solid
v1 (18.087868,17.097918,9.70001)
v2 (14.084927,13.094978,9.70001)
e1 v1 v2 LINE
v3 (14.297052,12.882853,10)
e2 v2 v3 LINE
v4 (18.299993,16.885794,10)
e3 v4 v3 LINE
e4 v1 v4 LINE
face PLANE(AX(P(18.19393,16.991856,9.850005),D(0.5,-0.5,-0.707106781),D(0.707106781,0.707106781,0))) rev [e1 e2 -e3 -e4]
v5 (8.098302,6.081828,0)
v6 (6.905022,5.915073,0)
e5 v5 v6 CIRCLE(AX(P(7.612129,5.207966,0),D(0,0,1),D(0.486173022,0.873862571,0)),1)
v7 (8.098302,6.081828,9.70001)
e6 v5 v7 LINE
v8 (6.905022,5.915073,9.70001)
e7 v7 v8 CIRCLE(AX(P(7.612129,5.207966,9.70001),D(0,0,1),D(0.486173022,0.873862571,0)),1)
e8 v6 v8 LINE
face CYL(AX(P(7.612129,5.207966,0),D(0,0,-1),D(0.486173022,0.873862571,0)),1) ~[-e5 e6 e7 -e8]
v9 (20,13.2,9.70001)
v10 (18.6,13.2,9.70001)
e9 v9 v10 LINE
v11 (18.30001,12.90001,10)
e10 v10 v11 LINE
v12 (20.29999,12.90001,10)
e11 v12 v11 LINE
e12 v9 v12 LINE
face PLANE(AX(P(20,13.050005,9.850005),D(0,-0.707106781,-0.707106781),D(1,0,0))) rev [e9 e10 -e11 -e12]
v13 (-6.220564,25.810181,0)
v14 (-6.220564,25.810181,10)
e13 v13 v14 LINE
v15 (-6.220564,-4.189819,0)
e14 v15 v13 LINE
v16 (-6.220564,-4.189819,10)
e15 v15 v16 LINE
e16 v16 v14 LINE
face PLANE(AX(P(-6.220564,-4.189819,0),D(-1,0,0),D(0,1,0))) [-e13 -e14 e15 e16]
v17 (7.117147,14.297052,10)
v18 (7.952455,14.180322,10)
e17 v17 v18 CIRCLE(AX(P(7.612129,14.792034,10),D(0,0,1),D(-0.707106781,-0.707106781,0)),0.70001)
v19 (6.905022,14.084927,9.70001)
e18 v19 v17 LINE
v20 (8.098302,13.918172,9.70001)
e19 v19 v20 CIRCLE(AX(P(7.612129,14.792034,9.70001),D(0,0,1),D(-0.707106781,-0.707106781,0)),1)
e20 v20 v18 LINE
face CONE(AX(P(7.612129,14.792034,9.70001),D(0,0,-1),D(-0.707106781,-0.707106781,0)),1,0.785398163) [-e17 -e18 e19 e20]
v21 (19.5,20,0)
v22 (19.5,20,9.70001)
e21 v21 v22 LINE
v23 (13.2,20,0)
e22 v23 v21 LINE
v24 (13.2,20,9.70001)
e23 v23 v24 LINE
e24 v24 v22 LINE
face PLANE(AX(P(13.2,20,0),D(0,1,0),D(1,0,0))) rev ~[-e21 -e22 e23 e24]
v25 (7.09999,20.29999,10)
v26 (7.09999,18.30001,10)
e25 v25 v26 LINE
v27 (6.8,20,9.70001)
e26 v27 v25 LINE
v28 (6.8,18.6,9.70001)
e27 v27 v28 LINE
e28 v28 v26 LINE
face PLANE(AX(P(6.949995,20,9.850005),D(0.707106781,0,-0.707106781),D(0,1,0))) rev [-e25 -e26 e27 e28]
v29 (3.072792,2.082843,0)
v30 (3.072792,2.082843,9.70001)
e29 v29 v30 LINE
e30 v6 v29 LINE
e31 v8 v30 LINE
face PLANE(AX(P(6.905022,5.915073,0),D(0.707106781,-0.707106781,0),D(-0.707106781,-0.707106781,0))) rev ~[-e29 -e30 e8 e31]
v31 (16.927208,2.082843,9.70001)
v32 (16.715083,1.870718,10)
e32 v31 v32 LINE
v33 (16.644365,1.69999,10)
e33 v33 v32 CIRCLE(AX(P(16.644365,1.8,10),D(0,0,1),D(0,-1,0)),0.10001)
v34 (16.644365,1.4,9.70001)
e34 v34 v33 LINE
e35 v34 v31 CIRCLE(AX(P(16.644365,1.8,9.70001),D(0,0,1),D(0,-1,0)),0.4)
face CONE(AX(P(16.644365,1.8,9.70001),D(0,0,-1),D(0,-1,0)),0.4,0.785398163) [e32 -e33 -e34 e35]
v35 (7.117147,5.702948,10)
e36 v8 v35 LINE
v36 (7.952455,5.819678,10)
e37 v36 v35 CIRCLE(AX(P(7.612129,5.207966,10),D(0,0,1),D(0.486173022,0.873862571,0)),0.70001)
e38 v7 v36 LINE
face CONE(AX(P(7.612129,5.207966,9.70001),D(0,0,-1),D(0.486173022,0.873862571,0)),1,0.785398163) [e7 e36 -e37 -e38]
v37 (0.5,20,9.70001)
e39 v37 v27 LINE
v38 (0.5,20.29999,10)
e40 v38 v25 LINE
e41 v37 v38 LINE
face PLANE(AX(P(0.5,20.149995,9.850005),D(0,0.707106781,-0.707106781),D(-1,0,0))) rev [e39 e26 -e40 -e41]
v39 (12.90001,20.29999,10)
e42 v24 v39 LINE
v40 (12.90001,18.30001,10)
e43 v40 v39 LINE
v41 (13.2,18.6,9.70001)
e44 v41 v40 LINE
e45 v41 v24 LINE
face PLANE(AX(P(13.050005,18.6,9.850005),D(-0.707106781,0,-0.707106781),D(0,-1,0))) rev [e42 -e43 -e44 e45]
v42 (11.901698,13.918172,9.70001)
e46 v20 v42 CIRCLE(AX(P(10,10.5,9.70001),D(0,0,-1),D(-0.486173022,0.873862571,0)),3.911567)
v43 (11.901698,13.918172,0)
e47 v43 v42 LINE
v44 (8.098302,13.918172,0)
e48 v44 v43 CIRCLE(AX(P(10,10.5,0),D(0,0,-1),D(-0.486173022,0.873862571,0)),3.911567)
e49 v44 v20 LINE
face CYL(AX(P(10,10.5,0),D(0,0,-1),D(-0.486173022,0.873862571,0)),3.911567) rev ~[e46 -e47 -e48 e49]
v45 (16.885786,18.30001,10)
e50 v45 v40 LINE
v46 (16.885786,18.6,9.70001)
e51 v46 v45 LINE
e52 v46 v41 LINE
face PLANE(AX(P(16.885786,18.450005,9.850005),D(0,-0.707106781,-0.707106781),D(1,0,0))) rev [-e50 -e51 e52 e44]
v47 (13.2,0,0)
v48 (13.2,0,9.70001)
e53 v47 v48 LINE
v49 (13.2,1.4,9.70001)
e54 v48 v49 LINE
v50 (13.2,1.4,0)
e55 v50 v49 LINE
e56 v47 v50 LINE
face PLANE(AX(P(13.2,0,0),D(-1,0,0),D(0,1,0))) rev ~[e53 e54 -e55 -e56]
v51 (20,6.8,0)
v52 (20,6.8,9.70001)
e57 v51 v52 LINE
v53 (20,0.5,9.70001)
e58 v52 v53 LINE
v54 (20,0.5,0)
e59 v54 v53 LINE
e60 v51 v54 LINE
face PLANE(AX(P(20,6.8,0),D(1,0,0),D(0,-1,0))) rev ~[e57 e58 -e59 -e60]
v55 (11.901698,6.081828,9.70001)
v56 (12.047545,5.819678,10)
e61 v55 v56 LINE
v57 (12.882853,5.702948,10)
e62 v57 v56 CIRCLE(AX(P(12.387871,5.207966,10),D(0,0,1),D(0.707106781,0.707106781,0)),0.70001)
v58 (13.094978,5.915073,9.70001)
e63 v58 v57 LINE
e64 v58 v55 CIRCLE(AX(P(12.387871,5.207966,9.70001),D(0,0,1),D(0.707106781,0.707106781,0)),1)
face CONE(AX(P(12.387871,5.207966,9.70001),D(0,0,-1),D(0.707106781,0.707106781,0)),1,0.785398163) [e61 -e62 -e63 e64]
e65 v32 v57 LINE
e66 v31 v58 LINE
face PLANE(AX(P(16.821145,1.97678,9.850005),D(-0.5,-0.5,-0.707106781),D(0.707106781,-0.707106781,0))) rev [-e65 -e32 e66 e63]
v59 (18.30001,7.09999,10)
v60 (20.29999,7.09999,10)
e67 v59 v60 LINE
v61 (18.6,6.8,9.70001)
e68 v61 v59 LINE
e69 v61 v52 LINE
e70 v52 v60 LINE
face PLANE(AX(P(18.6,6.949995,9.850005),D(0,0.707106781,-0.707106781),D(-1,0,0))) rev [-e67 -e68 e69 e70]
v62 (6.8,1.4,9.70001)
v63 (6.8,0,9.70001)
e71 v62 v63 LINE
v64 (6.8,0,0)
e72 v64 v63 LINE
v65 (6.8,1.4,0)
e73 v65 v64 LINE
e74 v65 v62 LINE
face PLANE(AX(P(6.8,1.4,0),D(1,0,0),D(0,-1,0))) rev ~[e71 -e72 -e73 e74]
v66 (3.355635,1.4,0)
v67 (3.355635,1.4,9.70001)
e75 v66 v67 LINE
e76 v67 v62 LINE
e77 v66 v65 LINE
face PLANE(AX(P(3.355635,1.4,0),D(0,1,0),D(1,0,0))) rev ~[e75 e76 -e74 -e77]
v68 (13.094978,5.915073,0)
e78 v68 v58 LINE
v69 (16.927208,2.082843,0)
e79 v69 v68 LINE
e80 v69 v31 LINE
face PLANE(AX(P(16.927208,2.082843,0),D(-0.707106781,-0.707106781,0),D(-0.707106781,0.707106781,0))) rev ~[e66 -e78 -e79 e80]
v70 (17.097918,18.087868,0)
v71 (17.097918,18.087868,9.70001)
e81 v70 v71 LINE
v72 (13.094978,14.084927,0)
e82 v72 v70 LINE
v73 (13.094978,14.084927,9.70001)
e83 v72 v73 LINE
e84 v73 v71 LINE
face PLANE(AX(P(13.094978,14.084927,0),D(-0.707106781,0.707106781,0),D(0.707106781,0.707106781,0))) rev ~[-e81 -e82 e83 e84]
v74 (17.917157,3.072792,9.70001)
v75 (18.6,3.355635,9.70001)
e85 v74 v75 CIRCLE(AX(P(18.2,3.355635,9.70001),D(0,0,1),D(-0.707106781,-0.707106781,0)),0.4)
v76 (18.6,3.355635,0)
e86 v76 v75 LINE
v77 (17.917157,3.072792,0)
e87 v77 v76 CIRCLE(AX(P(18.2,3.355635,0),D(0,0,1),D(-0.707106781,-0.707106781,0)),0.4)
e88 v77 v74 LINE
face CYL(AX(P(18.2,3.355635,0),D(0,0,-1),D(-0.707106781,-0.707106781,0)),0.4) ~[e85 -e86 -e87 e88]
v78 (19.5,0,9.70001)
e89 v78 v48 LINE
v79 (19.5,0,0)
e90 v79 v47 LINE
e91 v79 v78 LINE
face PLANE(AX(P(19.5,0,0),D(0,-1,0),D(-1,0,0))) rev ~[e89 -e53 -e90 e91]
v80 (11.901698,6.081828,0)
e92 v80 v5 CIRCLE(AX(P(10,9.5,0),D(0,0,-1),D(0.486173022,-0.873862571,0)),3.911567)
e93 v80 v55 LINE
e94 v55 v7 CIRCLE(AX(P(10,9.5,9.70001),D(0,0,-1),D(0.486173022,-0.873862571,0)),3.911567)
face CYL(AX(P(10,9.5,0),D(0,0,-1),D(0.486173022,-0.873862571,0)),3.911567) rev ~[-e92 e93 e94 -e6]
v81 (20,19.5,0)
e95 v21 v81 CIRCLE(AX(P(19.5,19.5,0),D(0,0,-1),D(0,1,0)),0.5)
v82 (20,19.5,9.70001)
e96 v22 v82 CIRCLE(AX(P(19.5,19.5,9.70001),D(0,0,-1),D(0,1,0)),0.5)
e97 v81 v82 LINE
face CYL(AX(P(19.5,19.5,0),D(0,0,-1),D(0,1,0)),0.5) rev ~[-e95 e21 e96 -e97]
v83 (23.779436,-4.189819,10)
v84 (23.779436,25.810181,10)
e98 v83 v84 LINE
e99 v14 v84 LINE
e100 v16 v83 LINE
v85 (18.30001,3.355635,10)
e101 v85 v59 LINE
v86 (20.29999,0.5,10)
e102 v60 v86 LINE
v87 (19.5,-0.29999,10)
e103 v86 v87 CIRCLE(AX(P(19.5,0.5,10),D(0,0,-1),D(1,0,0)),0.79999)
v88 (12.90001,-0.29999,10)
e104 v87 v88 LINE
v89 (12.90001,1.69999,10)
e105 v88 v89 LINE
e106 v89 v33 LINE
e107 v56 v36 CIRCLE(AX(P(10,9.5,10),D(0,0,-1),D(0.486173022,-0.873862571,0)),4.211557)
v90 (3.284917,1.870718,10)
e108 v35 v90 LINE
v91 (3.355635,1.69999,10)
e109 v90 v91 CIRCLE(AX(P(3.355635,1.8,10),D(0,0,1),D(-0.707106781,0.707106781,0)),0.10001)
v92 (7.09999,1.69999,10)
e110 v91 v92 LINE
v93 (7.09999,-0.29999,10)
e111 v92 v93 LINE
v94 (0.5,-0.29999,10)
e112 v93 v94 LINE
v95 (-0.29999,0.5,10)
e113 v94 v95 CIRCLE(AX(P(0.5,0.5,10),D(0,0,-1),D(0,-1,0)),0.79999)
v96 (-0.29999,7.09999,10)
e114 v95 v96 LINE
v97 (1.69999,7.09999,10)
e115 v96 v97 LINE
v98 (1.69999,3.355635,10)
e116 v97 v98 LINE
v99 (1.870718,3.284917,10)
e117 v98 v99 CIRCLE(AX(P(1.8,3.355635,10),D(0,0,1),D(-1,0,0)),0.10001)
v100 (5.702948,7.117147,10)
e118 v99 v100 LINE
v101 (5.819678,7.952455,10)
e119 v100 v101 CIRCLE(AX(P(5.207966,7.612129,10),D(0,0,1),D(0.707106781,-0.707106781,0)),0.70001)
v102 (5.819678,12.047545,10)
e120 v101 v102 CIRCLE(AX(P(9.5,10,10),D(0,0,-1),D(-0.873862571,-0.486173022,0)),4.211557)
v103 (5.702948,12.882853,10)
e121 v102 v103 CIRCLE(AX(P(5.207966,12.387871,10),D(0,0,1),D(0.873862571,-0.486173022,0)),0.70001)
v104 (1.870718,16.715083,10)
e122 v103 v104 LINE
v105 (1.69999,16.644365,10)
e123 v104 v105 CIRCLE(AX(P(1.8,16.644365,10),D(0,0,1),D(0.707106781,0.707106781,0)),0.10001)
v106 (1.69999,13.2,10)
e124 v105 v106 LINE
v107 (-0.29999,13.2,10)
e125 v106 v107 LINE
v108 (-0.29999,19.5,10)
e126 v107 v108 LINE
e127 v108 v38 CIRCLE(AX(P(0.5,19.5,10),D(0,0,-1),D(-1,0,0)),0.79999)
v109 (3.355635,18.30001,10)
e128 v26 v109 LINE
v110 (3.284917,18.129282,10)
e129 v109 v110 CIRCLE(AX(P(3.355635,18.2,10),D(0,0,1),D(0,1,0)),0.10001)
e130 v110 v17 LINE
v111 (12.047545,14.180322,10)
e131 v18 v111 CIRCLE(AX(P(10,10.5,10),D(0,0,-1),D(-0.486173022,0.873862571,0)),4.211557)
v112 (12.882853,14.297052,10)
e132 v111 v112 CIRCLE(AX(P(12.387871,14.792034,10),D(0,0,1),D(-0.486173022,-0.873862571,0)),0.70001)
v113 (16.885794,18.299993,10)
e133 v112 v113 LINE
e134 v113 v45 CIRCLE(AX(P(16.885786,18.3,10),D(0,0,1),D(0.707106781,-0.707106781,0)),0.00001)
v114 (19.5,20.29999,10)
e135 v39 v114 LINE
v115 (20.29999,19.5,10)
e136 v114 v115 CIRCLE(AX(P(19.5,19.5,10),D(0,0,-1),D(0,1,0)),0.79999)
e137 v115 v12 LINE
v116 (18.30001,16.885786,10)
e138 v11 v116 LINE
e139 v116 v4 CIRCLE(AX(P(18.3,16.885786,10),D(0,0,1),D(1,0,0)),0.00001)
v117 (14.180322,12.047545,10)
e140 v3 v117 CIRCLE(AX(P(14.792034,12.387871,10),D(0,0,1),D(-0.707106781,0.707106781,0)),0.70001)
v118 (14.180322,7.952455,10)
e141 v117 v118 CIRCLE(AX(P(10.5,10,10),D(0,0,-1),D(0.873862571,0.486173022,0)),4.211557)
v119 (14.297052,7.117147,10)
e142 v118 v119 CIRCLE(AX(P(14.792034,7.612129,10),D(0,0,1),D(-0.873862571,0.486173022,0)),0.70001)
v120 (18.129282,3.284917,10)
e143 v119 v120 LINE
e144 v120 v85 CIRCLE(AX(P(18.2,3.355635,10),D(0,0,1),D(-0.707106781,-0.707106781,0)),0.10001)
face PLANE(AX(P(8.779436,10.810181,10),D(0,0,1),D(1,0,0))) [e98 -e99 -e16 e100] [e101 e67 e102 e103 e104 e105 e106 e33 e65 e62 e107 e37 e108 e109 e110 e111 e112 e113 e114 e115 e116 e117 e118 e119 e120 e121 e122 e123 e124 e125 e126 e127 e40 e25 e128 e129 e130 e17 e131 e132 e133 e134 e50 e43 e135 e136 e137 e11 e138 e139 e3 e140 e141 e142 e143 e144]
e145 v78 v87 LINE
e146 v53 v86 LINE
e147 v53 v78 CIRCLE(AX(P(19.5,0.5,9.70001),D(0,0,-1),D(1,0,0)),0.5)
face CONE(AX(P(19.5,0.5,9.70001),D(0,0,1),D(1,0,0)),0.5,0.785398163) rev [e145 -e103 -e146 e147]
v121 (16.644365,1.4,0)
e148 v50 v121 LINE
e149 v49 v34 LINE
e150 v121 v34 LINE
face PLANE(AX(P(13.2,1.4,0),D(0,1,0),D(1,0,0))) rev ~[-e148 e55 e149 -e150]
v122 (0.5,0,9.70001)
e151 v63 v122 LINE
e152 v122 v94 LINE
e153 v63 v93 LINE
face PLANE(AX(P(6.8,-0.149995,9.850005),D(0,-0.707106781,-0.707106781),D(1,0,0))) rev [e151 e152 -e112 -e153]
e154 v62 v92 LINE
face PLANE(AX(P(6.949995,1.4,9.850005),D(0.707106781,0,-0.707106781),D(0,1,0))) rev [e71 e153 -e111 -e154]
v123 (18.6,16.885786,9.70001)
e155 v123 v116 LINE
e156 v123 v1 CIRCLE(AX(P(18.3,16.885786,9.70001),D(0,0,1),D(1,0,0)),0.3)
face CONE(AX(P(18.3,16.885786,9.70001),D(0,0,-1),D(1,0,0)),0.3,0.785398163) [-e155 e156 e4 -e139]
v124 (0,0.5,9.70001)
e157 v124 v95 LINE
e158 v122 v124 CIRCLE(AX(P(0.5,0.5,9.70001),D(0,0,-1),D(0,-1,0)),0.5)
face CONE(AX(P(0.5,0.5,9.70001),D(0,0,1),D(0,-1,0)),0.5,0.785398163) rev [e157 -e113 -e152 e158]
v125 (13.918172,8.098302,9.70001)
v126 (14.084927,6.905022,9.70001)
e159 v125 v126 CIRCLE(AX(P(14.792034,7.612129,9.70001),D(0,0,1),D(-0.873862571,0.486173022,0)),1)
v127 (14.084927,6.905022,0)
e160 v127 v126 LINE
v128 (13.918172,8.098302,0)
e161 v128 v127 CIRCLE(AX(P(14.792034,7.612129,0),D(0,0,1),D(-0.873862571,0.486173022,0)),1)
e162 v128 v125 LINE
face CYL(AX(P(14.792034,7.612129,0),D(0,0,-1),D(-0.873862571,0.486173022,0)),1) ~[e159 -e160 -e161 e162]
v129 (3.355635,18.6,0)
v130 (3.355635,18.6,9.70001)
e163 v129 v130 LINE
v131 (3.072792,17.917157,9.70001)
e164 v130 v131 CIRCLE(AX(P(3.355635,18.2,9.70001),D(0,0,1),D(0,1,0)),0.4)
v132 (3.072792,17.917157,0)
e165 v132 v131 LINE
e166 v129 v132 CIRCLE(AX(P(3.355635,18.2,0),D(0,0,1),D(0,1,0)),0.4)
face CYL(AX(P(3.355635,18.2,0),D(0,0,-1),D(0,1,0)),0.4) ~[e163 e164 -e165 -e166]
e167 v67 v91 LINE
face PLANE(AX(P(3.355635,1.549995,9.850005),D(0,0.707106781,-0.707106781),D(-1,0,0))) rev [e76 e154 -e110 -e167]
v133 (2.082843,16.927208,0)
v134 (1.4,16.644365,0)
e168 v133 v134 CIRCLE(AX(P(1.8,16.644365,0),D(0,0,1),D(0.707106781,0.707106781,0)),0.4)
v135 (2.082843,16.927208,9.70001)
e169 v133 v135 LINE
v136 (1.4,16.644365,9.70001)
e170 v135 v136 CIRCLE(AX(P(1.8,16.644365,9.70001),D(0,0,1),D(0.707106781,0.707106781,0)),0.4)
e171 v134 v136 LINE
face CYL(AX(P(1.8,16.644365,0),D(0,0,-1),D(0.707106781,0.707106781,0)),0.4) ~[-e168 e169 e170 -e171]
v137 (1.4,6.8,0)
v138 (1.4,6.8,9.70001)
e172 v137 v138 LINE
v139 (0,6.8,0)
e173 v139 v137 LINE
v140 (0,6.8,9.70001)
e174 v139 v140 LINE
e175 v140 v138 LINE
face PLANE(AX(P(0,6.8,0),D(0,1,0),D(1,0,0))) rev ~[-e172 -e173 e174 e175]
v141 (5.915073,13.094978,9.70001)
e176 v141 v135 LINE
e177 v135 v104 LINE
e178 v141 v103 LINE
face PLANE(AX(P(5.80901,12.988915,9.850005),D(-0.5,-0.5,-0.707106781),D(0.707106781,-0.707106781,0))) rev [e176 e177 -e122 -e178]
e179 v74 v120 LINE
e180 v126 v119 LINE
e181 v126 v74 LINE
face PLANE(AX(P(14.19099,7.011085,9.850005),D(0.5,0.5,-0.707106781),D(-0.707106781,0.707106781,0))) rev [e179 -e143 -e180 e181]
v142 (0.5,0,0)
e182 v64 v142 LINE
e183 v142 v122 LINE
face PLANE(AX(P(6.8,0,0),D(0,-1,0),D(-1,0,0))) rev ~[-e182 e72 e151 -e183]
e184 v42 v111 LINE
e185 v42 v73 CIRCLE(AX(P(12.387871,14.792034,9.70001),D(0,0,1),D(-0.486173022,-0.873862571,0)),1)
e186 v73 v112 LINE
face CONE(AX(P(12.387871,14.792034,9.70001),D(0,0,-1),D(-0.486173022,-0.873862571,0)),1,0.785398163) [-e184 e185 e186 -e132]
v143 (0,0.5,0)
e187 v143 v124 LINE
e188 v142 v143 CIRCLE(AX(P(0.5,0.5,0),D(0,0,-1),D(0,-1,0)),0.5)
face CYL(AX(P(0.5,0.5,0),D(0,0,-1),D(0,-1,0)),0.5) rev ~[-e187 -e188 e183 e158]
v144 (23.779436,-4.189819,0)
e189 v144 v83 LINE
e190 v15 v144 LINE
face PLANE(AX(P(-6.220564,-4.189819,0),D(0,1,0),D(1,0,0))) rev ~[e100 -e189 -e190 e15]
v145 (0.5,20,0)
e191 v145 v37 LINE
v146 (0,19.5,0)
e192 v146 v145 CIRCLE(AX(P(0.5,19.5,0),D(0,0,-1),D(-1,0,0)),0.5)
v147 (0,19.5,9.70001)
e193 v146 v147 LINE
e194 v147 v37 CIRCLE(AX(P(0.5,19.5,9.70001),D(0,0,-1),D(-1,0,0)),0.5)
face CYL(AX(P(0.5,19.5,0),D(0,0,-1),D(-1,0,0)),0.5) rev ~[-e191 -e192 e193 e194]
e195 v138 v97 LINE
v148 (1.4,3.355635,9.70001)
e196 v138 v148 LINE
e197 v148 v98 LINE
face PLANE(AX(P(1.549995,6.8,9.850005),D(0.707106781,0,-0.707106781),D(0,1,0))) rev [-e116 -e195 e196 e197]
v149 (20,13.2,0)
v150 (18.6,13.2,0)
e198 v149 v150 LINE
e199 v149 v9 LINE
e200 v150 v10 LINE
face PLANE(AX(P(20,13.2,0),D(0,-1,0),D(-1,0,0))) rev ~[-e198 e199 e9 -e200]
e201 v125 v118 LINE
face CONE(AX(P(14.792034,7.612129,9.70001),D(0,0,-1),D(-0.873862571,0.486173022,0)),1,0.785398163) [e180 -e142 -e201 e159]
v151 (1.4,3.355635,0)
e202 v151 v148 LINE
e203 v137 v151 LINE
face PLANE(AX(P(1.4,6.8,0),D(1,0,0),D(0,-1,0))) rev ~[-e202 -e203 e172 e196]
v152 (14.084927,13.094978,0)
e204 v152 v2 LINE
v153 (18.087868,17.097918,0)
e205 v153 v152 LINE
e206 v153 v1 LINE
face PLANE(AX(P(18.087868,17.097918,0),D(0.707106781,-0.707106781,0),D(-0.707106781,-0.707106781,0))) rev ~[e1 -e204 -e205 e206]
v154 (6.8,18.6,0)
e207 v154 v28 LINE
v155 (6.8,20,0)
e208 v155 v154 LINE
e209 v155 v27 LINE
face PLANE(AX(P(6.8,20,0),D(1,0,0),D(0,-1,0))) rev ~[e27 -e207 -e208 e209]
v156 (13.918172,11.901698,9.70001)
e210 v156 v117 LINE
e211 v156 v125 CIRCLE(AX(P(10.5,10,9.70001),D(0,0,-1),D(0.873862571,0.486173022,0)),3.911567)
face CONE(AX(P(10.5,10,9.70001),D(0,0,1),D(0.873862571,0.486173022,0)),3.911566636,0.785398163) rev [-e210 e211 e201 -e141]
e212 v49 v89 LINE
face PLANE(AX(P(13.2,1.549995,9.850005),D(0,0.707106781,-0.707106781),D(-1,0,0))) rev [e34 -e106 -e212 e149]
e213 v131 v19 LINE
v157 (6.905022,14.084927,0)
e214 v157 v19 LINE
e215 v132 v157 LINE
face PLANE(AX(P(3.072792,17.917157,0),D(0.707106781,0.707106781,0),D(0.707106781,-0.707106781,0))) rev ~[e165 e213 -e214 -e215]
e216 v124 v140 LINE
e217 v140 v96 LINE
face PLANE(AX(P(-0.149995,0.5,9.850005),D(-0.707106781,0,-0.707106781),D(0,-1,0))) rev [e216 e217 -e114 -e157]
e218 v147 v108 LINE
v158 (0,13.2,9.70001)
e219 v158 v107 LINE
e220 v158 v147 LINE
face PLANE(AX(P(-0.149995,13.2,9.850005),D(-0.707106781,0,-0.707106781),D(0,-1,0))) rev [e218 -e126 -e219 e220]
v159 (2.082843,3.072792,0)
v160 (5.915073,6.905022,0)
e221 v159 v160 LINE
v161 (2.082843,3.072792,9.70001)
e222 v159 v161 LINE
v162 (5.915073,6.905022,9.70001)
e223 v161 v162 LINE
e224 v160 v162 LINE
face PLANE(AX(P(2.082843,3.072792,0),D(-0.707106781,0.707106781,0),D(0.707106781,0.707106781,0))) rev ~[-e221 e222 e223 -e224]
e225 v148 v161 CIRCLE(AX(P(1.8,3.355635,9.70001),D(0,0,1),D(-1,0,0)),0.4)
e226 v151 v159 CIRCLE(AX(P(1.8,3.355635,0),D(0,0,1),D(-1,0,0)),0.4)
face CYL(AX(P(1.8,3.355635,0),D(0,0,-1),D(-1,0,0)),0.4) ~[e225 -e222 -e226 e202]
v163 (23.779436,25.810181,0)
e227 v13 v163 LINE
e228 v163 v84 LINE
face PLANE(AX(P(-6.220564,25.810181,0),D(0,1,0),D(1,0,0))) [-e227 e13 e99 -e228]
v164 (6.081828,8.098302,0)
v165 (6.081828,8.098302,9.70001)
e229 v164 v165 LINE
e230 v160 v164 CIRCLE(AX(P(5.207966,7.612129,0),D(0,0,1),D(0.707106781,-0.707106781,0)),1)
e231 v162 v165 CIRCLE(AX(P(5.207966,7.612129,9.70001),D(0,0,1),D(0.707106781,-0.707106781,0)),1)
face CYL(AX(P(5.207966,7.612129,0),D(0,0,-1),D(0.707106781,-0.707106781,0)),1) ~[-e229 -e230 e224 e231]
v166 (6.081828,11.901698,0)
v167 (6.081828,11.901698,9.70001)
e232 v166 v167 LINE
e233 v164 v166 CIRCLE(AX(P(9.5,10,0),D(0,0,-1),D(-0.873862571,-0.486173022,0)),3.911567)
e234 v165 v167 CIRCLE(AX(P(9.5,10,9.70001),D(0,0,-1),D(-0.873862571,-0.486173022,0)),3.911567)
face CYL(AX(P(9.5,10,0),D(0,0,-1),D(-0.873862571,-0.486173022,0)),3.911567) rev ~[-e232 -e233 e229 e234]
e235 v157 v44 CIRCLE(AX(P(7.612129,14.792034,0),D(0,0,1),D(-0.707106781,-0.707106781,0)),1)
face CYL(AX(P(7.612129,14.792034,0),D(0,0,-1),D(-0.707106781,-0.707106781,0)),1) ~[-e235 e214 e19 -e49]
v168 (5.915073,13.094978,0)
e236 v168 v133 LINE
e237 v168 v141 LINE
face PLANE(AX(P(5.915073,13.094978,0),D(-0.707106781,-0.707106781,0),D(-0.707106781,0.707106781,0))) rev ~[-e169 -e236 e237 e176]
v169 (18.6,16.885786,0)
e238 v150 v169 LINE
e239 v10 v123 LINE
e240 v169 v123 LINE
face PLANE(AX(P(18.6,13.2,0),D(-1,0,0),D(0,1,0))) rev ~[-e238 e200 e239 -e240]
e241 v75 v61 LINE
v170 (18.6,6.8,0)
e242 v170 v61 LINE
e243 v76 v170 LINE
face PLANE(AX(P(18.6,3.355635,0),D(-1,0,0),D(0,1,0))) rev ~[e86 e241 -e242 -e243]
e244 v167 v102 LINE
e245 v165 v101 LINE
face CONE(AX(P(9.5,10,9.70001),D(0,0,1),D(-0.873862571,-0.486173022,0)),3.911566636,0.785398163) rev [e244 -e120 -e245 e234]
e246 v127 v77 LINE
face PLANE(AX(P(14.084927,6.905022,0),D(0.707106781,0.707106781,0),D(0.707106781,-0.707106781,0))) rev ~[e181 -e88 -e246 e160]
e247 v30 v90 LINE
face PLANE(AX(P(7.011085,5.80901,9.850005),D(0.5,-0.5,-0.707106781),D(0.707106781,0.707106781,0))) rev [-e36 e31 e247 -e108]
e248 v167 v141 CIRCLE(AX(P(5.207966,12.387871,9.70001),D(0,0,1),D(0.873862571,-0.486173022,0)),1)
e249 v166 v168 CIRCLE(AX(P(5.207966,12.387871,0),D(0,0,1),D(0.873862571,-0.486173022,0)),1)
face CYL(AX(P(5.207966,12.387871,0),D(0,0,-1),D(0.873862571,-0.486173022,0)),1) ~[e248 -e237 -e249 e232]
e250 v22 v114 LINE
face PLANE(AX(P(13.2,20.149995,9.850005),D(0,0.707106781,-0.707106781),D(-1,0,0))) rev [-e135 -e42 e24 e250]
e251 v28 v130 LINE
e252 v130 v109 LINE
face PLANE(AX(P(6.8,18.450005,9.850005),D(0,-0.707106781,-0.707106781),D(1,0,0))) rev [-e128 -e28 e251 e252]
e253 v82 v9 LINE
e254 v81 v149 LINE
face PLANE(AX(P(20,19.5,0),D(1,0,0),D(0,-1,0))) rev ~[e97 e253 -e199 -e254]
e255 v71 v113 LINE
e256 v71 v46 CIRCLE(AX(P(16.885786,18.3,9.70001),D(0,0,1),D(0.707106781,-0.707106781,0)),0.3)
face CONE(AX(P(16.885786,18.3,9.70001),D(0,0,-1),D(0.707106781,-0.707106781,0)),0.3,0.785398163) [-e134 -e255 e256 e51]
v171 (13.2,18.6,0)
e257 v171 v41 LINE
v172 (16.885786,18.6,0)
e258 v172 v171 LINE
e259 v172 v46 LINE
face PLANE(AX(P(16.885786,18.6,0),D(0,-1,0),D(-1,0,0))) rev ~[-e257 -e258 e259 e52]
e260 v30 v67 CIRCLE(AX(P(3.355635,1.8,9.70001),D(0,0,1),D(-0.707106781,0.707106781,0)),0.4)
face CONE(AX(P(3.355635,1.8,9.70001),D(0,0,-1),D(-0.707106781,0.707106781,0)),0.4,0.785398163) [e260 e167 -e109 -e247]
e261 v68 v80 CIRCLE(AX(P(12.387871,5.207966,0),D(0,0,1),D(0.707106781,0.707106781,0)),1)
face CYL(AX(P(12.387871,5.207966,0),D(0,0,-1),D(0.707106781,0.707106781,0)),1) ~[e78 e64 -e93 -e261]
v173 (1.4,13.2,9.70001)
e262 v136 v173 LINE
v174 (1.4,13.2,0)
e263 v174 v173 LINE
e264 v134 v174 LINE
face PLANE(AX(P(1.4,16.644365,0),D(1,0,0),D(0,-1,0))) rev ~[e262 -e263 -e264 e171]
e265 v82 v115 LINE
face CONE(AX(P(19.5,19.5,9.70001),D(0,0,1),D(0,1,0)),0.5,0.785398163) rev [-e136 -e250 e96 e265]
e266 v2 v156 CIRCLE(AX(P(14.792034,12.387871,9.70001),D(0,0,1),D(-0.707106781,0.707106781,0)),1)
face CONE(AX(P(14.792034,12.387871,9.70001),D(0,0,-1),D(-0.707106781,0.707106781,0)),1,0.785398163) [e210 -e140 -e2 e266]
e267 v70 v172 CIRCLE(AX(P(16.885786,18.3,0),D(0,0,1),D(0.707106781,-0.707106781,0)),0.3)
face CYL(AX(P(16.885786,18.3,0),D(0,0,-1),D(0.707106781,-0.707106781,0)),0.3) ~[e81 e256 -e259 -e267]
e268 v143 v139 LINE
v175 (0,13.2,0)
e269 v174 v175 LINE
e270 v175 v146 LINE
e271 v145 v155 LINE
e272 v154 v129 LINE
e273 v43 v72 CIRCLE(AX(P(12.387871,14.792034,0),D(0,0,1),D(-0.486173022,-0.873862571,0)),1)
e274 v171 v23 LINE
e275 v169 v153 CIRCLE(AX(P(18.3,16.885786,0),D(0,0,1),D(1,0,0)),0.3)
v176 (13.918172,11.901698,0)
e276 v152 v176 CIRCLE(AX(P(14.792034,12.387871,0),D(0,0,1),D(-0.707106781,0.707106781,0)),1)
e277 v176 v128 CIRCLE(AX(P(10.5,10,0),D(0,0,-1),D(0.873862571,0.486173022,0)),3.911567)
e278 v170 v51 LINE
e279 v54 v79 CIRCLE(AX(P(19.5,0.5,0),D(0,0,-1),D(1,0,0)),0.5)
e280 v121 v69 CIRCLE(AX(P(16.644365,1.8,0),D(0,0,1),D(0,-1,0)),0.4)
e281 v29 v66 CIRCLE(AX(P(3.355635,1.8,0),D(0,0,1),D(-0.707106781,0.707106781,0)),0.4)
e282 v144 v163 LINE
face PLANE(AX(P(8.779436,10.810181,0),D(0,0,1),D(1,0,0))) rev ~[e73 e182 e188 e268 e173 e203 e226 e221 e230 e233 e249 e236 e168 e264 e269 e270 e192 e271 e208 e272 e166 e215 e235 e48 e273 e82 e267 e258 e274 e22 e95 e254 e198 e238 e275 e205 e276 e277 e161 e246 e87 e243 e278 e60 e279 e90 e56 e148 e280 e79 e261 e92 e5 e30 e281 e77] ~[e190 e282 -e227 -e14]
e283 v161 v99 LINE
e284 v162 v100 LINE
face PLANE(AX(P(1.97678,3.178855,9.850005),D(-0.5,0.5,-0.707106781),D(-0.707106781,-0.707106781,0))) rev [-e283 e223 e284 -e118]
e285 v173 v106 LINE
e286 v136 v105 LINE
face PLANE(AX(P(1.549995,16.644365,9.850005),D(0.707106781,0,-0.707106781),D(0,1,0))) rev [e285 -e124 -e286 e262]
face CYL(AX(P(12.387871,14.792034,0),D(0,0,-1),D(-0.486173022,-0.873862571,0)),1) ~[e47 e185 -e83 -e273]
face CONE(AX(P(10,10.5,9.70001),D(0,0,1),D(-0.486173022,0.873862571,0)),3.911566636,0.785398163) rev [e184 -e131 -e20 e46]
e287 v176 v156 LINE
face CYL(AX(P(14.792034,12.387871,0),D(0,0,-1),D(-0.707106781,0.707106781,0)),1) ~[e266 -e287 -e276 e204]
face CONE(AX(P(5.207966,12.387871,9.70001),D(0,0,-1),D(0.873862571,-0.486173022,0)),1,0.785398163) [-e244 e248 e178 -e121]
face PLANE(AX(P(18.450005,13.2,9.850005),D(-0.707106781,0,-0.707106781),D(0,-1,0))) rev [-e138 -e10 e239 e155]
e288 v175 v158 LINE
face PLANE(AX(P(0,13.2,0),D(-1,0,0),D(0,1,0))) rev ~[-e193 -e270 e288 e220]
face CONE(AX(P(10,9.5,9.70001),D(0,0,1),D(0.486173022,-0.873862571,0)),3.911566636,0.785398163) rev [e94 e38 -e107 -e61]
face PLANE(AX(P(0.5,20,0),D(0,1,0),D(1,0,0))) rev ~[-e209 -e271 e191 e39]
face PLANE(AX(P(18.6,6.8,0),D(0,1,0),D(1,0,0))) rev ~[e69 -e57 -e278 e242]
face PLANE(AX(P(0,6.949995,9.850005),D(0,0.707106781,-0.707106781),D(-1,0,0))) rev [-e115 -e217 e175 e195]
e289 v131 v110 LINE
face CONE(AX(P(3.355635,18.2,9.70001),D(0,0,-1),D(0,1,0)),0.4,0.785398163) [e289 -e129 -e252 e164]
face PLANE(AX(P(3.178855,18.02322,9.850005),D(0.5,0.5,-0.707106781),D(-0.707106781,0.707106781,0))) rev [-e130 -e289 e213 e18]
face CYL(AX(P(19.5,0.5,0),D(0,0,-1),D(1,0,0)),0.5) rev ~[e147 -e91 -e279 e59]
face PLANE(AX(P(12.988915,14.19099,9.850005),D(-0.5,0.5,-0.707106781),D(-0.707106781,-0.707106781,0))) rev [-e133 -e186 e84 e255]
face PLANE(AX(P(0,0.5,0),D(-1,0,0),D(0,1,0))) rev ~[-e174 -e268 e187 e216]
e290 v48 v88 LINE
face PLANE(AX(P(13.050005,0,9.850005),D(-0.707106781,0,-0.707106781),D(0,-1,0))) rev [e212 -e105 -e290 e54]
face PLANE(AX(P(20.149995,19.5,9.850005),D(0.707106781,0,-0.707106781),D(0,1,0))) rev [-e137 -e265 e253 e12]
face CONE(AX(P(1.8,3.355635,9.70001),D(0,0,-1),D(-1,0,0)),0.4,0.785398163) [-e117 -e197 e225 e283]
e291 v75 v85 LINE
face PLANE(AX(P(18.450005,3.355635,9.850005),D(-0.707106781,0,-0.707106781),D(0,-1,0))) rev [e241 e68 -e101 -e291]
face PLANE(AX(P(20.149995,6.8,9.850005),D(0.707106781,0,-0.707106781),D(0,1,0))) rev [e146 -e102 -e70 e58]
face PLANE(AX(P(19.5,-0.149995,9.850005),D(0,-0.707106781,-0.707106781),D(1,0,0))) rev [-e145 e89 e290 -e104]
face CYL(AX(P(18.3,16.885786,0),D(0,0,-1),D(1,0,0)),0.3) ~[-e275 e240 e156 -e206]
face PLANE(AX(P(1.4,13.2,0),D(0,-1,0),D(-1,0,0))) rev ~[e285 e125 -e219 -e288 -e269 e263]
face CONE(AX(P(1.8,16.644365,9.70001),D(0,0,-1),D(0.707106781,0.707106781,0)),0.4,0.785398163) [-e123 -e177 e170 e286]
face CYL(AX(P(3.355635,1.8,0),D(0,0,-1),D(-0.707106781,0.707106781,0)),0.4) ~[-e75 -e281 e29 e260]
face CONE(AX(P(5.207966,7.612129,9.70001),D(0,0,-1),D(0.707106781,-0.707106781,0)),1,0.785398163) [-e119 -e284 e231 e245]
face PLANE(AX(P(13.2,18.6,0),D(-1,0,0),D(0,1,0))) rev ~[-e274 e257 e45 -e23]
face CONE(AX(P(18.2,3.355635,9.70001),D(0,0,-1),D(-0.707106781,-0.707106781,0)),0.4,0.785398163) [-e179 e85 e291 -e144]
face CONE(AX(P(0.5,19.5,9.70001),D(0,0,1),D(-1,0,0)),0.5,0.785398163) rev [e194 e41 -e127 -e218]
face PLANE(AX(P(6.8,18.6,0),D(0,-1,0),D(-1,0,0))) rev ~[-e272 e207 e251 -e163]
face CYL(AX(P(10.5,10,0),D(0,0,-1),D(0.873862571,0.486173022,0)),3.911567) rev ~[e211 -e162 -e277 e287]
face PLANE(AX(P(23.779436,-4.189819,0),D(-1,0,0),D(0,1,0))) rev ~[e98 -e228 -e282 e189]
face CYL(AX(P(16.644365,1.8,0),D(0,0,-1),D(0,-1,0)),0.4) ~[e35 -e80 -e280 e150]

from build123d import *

# Parameters (mm, degrees)
F0_W     = 30
F0_H     = 30
F1_DEPTH = 10
F2_SIZE  = 0.29999


# Not quite as in the source:
# - a fillet or chamfer is up to 0.001 mm smaller than in the source, because OpenCascade refuses the exact size


with BuildPart() as f1:
    # F0 (on Top) → F1 (new body)
    with BuildSketch(Plane.XY):
        with Locations((8.7794362941, 10.8101805312)):
            Rectangle(F0_W, F0_H)
        with BuildLine():
            Line((13.2, 20), (19.5, 20))
            ThreePointArc((19.5, 20), (19.8535533906, 19.8535533906), (20, 19.5))
            Line((20, 19.5), (20, 13.2))
            Line((20, 13.2), (18.6, 13.2))
            Line((18.6, 13.2), (18.6, 16.8857864376))
            ThreePointArc((18.6, 16.8857864376), (18.4148050297, 17.1629502974), (18.0878679656, 17.097918472))
            Line((18.0878679656, 17.097918472), (14.0849274668, 13.0949779732))
            ThreePointArc((14.0849274668, 13.0949779732), (13.8016579584, 12.5262720767), (13.918171677, 11.9016981704))
            ThreePointArc((13.918171677, 11.9016981704), (14.4115666356, 10), (13.918171677, 8.0983018296))
            ThreePointArc((13.918171677, 8.0983018296), (13.8016579584, 7.4737279233), (14.0849274668, 6.9050220268))
            Line((14.0849274668, 6.9050220268), (17.9171572875, 3.0727922061))
            ThreePointArc((17.9171572875, 3.0727922061), (18.3530733729, 2.9860831056), (18.6, 3.3556349186))
            Line((18.6, 3.3556349186), (18.6, 6.8))
            Line((18.6, 6.8), (20, 6.8))
            Line((20, 6.8), (20, 0.5))
            ThreePointArc((20, 0.5), (19.8535533906, 0.1464466094), (19.5, 0))
            Line((19.5, 0), (13.2, 0))
            Line((13.2, 0), (13.2, 1.4))
            Line((13.2, 1.4), (16.6443650814, 1.4))
            ThreePointArc((16.6443650814, 1.4), (17.0139168944, 1.6469266271), (16.9272077939, 2.0828427125))
            Line((16.9272077939, 2.0828427125), (13.0949779732, 5.9150725332))
            ThreePointArc((13.0949779732, 5.9150725332), (12.5262720767, 6.1983420416), (11.9016981704, 6.081828323))
            ThreePointArc((11.9016981704, 6.081828323), (10, 5.5884333644), (8.0983018296, 6.081828323))
            ThreePointArc((8.0983018296, 6.081828323), (7.4737279233, 6.1983420416), (6.9050220268, 5.9150725332))
            Line((6.9050220268, 5.9150725332), (3.0727922061, 2.0828427125))
            ThreePointArc((3.0727922061, 2.0828427125), (2.9860831056, 1.6469266271), (3.3556349186, 1.4))
            Line((3.3556349186, 1.4), (6.8, 1.4))
            Line((6.8, 1.4), (6.8, 0))
            Line((6.8, 0), (0.5, 0))
            ThreePointArc((0.5, 0), (0.1464466094, 0.1464466094), (0, 0.5))
            Line((0, 0.5), (0, 6.8))
            Line((0, 6.8), (1.4, 6.8))
            Line((1.4, 6.8), (1.4, 3.3556349186))
            ThreePointArc((1.4, 3.3556349186), (1.6469266271, 2.9860831056), (2.0828427125, 3.0727922061))
            Line((2.0828427125, 3.0727922061), (5.9150725332, 6.9050220268))
            ThreePointArc((5.9150725332, 6.9050220268), (6.1983420416, 7.4737279233), (6.081828323, 8.0983018296))
            ThreePointArc((6.081828323, 8.0983018296), (5.5884333644, 10), (6.081828323, 11.9016981704))
            ThreePointArc((6.081828323, 11.9016981704), (6.1983420416, 12.5262720767), (5.9150725332, 13.0949779732))
            Line((5.9150725332, 13.0949779732), (2.0828427125, 16.9272077939))
            ThreePointArc((2.0828427125, 16.9272077939), (1.6469266271, 17.0139168944), (1.4, 16.6443650814))
            Line((1.4, 16.6443650814), (1.4, 13.2))
            Line((1.4, 13.2), (0, 13.2))
            Line((0, 13.2), (0, 19.5))
            ThreePointArc((0, 19.5), (0.1464466094, 19.8535533906), (0.5, 20))
            Line((0.5, 20), (6.8, 20))
            Line((6.8, 20), (6.8, 18.6))
            Line((6.8, 18.6), (3.3556349186, 18.6))
            ThreePointArc((3.3556349186, 18.6), (2.9860831056, 18.3530733729), (3.0727922061, 17.9171572875))
            Line((3.0727922061, 17.9171572875), (6.9050220268, 14.0849274668))
            ThreePointArc((6.9050220268, 14.0849274668), (7.4737279233, 13.8016579584), (8.0983018296, 13.918171677))
            ThreePointArc((8.0983018296, 13.918171677), (10, 14.4115666356), (11.9016981704, 13.918171677))
            ThreePointArc((11.9016981704, 13.918171677), (12.5262720767, 13.8016579584), (13.0949779732, 14.0849274668))
            Line((13.0949779732, 14.0849274668), (17.097918472, 18.0878679656))
            ThreePointArc((17.097918472, 18.0878679656), (17.1629502974, 18.4148050297), (16.8857864376, 18.6))
            Line((16.8857864376, 18.6), (13.2, 18.6))
            Line((13.2, 18.6), (13.2, 20))
        make_face(mode=Mode.SUBTRACT)
    extrude(amount=F1_DEPTH)

    # F2 (size 0.3 in the source; OpenCascade refuses exactly that, so slightly less here)
    f2_edges = [f1.edges().sort_by_distance(p)[0] for p in [
        (0, 16.35, 10),
        (4.988907, 16.001042, 10),
        (3.998958, 15.011093, 10),
        (7.473728, 6.198342, 10),
        (14.411567, 10, 10),
        (19.3, 13.2, 10),
        (16.35, 20, 10),
        (13.2, 19.3, 10),
        (6.8, 19.3, 10),
        (20, 3.65, 10),
        (13.2, 0.7, 10),
        (6.8, 0.7, 10),
        (0.7, 6.8, 10),
        (19.3, 6.8, 10),
        (0, 3.65, 10),
    ]]
    chamfer(f2_edges, length=F2_SIZE)


solid = f1.part
